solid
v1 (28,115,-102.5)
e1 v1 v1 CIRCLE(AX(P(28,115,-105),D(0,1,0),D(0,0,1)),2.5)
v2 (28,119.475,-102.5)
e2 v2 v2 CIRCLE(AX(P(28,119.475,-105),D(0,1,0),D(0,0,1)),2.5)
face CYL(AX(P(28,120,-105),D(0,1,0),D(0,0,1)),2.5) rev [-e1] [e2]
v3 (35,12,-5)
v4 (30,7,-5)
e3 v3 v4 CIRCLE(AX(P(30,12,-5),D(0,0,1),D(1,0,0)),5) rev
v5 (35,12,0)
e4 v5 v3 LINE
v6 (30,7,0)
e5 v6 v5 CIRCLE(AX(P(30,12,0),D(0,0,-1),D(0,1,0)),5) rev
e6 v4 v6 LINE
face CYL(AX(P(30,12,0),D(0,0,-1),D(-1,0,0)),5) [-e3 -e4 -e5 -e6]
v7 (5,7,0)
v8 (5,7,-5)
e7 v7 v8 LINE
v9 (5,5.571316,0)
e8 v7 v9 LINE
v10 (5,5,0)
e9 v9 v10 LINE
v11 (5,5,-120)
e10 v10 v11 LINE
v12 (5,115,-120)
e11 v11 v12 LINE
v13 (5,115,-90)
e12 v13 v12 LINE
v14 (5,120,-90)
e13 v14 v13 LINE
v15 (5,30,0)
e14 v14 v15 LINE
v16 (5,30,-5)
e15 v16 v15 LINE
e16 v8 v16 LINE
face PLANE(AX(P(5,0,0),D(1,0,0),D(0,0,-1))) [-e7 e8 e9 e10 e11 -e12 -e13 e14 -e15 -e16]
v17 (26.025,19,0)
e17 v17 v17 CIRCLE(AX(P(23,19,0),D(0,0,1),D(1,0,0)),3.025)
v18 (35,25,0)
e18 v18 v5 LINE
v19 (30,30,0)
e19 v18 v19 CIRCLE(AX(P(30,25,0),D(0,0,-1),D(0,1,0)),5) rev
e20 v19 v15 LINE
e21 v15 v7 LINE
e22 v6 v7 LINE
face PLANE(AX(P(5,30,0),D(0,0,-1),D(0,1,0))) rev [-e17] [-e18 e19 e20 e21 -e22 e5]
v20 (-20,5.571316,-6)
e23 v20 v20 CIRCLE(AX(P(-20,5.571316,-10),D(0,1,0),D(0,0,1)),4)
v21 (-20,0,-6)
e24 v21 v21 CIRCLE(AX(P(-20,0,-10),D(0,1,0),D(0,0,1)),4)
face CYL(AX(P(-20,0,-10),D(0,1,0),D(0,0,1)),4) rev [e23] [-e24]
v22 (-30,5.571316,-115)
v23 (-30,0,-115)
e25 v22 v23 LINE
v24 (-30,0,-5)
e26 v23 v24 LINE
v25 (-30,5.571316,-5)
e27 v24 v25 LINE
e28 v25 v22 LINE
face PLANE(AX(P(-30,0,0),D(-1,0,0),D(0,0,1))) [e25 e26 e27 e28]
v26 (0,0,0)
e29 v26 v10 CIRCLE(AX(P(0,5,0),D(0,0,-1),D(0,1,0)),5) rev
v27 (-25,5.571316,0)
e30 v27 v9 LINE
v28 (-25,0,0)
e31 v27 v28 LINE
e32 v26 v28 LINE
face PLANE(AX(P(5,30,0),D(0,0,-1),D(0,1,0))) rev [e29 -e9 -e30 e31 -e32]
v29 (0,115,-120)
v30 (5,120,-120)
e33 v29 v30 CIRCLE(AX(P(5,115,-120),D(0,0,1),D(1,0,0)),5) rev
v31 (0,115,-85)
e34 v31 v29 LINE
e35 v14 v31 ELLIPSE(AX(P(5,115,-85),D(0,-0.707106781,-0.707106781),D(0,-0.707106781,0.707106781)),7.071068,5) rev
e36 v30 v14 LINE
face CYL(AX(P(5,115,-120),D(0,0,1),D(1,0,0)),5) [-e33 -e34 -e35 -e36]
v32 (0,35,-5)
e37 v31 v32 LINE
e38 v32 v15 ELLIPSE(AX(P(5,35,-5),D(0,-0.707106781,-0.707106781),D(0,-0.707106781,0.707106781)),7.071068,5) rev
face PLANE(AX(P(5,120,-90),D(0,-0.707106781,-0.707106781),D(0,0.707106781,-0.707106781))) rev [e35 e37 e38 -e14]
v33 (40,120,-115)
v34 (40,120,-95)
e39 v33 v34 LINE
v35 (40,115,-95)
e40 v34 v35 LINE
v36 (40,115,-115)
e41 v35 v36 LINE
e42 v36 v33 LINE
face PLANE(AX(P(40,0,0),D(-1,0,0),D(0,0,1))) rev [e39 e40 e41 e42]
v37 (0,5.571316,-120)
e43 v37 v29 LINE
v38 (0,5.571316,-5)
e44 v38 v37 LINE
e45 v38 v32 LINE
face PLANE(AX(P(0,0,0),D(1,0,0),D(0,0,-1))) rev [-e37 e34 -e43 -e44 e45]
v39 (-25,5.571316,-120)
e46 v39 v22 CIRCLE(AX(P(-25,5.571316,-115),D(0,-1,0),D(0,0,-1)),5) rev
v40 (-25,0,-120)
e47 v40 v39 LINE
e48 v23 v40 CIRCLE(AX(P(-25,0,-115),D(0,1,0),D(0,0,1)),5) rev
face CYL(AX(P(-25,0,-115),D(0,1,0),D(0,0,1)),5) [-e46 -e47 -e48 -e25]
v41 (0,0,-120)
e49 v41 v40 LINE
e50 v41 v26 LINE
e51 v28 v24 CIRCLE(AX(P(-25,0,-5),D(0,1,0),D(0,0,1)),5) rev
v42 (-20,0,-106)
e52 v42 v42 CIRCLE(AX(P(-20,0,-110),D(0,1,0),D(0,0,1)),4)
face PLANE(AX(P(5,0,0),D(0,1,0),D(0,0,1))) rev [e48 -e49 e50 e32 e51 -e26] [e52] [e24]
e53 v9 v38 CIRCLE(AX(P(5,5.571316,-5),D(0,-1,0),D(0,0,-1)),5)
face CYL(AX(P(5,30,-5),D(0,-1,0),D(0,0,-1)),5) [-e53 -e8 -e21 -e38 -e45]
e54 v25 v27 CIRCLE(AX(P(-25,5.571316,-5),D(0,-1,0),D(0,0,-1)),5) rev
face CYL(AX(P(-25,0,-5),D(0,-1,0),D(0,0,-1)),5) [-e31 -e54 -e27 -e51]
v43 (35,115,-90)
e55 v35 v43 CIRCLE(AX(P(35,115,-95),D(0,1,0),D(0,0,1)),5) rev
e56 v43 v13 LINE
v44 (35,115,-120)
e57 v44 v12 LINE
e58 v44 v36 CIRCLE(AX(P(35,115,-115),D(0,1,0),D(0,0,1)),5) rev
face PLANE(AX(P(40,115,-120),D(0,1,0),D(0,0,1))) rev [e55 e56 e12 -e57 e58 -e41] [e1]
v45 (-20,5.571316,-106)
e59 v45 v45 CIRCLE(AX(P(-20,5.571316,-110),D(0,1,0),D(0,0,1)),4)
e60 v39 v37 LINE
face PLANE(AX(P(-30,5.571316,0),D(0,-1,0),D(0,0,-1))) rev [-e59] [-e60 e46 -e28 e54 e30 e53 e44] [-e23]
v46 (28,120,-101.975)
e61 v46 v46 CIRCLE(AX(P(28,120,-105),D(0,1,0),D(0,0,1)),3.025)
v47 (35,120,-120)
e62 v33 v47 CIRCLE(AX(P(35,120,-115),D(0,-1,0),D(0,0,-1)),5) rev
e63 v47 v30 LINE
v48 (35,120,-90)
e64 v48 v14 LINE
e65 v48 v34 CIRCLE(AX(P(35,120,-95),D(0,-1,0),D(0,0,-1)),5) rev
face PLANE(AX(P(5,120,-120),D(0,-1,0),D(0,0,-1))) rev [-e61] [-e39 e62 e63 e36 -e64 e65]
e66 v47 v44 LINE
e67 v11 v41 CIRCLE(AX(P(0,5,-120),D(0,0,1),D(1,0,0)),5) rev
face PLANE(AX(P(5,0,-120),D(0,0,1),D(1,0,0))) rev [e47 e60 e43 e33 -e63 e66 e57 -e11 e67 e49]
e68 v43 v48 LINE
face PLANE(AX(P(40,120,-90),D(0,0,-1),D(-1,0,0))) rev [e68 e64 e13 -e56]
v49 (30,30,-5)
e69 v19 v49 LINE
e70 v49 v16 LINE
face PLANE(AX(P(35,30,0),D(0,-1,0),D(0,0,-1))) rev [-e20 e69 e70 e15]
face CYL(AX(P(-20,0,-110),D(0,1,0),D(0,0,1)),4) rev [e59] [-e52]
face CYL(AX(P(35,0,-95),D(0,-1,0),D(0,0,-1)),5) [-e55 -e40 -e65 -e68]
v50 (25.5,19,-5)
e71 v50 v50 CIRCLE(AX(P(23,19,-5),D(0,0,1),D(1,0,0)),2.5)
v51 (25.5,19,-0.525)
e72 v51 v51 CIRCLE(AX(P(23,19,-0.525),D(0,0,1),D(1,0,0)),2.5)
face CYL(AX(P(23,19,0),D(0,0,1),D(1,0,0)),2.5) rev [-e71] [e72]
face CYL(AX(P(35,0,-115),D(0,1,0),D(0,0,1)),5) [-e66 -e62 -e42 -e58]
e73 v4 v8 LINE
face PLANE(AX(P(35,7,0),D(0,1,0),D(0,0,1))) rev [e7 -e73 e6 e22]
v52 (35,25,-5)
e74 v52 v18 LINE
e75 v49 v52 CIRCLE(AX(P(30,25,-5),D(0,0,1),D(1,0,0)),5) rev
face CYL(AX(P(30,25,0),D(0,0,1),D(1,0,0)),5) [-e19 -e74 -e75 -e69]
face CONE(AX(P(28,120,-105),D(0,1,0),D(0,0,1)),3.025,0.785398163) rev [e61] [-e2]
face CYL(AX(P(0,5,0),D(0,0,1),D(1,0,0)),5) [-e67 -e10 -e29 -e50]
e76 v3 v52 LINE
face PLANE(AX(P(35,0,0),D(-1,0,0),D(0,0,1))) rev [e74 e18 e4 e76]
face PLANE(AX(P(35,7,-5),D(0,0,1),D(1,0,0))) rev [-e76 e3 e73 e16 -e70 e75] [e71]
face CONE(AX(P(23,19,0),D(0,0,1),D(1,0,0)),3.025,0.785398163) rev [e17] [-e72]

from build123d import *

# Parameters (mm, degrees)
ESTRUSIONE_ESTRUSIONE1_DEPTH    = 5
SCHIZZO2_W                      = 120
SCHIZZO2_H                      = 5.571316046
ESTRUSIONE_ESTRUSIONE2_DEPTH    = 30
SCHIZZO3_W                      = 5
SCHIZZO3_H                      = 23
ESTRUSIONE_ESTRUSIONE3_DEPTH    = 30
SCHIZZO4_W                      = 30
SCHIZZO4_H                      = 5
ESTRUSIONE_ESTRUSIONE4_DEPTH    = 35
RACCORDO1_R                     = 5
FORO_FILETTATO_M6_2_D           = 5
FORO_FILETTATO_M6_2_CSINK_D     = 6.05
FORO_FILETTATO_M6_2_CSINK_ANGLE = 90
FORO_FILETTATO_M6_3_D           = 5
FORO_FILETTATO_M6_3_CSINK_D     = 6.05
FORO_FILETTATO_M6_3_CSINK_ANGLE = 90
SCHIZZO13_R                     = 4
TAGLIO_ESTRUSIONE1_DEPTH        = 171.569410245


with BuildPart() as part:
    # Schizzo1 → Estrusione-Estrusione1 (new body)
    with BuildSketch(Plane(origin=(0, 0, 0), x_dir=(0, 0, -1), z_dir=(1, 0, 0))):
        Polygon((0, 0), (120, 0), (120, 120), (90, 120), (0, 30), align=None)
    extrude(amount=ESTRUSIONE_ESTRUSIONE1_DEPTH)

    # Schizzo2 → Estrusione-Estrusione2 (add)
    with BuildSketch(Plane.ZY):
        with Locations((-60, 2.785658023)):
            Rectangle(SCHIZZO2_W, SCHIZZO2_H)
    extrude(amount=ESTRUSIONE_ESTRUSIONE2_DEPTH)

    # Schizzo3 → Estrusione-Estrusione3 (add)
    with BuildSketch(Plane(origin=(5, 0, 0), x_dir=(0, 0, -1), z_dir=(1, 0, 0))):
        with Locations((2.5, 18.5)):
            Rectangle(SCHIZZO3_W, SCHIZZO3_H)
    extrude(amount=ESTRUSIONE_ESTRUSIONE3_DEPTH)

    # Schizzo4 → Estrusione-Estrusione4 (add)
    with BuildSketch(Plane(origin=(5, 0, 0), x_dir=(0, 0, -1), z_dir=(1, 0, 0))):
        with Locations((105, 117.5)):
            Rectangle(SCHIZZO4_W, SCHIZZO4_H)
    extrude(amount=ESTRUSIONE_ESTRUSIONE4_DEPTH)

    # Raccordo1
    # the kernel refuses this fillet: 5 mm, written as the material it takes off along each edge
    with BuildSketch(Plane(origin=(40, 102.5, -120), x_dir=(0, 0, 1), z_dir=(0, 1, 0)), Plane(origin=(35, 7, 12.5), x_dir=(0, 1, 0), z_dir=(0, 0, -1))) as raccordo1_piece_1:
        with BuildLine():
            CenterArc((RACCORDO1_R, -RACCORDO1_R), RACCORDO1_R, 90, 90)
            Line((0, -RACCORDO1_R), (0, 0))
            Line((0, 0), (RACCORDO1_R, 0))
        make_face()
    extrude(amount=30, mode=Mode.SUBTRACT)
    with BuildSketch(Plane(origin=(40, 132.5, -90), x_dir=(-1, 0, 0), z_dir=(0, -1, 0)), Plane(origin=(35, 30, -17.5), x_dir=(-1, 0, 0), z_dir=(0, 0, 1))) as raccordo1_piece_2:
        with BuildLine():
            CenterArc((RACCORDO1_R, RACCORDO1_R), RACCORDO1_R, 180, 90)
            Line((0, RACCORDO1_R), (0, 0))
            Line((0, 0), (RACCORDO1_R, 0))
        make_face()
    extrude(amount=30, mode=Mode.SUBTRACT)
    with BuildSketch(Plane(origin=(-30, 18.071316046, 0), x_dir=(0, 0, -1), z_dir=(0, -1, 0)), Plane(origin=(-30, -12.5, -120), x_dir=(0, 0, 1), z_dir=(0, 1, 0))) as raccordo1_piece_3:
        with BuildLine():
            CenterArc((RACCORDO1_R, RACCORDO1_R), RACCORDO1_R, 180, 90)
            Line((0, RACCORDO1_R), (0, 0))
            Line((0, 0), (RACCORDO1_R, 0))
        make_face()
    extrude(amount=30.571316046, mode=Mode.SUBTRACT)
    with BuildSketch(Plane(origin=(5, 0, 12.5), x_dir=(-1, 0, 0), z_dir=(0, 0, -1))) as raccordo1_piece_4:
        with BuildLine():
            CenterArc((RACCORDO1_R, RACCORDO1_R), RACCORDO1_R, 180, 90)
            Line((0, RACCORDO1_R), (0, 0))
            Line((0, 0), (RACCORDO1_R, 0))
        make_face()
    extrude(amount=145, mode=Mode.SUBTRACT)
    with BuildSketch(Plane(origin=(0, 120, -132.5), x_dir=(0, -1, 0), z_dir=(0, 0, 1))) as raccordo1_piece_5:
        with BuildLine():
            CenterArc((RACCORDO1_R, RACCORDO1_R), RACCORDO1_R, 180, 90)
            Line((0, RACCORDO1_R), (0, 0))
            Line((0, 0), (RACCORDO1_R, 0))
        make_face()
    extrude(amount=55, mode=Mode.SUBTRACT)
    with BuildSketch(Plane(origin=(0, 42.5, 0), x_dir=(0, 0, -1), z_dir=(0, -1, 0))) as raccordo1_piece_6:
        with BuildLine():
            CenterArc((RACCORDO1_R, RACCORDO1_R), RACCORDO1_R, 180, 90)
            Line((0, RACCORDO1_R), (0, 0))
            Line((0, 0), (RACCORDO1_R, 0))
        make_face()
    extrude(amount=36.928683954, mode=Mode.SUBTRACT)

    # Foro filettato M6-2 (through all)
    with Locations(Plane(origin=(0, 120, 0), x_dir=(1, 0, 0), z_dir=(0, 1, 0))):
        with Locations((28, 105)):
            CounterSinkHole(FORO_FILETTATO_M6_2_D / 2, FORO_FILETTATO_M6_2_CSINK_D / 2, counter_sink_angle=FORO_FILETTATO_M6_2_CSINK_ANGLE)

    # Foro filettato M6-3 (through all)
    with Locations(Plane.XY):
        with Locations((23, 19)):
            CounterSinkHole(FORO_FILETTATO_M6_3_D / 2, FORO_FILETTATO_M6_3_CSINK_D / 2, counter_sink_angle=FORO_FILETTATO_M6_3_CSINK_ANGLE)

    # Schizzo13 → Taglio-Estrusione1 (cut, through all)
    with BuildSketch(Plane(origin=(0, 5.571316046, 0), x_dir=(1, 0, 0), z_dir=(0, 1, 0))):
        with Locations(Location((-20, 110, 0), (0, 0, 270))):
            Circle(SCHIZZO13_R)
        with Locations(Location((-20, 10, 0), (0, 0, 270))):
            Circle(SCHIZZO13_R)
    extrude(amount=-TAGLIO_ESTRUSIONE1_DEPTH, mode=Mode.SUBTRACT)


solid = part.part
